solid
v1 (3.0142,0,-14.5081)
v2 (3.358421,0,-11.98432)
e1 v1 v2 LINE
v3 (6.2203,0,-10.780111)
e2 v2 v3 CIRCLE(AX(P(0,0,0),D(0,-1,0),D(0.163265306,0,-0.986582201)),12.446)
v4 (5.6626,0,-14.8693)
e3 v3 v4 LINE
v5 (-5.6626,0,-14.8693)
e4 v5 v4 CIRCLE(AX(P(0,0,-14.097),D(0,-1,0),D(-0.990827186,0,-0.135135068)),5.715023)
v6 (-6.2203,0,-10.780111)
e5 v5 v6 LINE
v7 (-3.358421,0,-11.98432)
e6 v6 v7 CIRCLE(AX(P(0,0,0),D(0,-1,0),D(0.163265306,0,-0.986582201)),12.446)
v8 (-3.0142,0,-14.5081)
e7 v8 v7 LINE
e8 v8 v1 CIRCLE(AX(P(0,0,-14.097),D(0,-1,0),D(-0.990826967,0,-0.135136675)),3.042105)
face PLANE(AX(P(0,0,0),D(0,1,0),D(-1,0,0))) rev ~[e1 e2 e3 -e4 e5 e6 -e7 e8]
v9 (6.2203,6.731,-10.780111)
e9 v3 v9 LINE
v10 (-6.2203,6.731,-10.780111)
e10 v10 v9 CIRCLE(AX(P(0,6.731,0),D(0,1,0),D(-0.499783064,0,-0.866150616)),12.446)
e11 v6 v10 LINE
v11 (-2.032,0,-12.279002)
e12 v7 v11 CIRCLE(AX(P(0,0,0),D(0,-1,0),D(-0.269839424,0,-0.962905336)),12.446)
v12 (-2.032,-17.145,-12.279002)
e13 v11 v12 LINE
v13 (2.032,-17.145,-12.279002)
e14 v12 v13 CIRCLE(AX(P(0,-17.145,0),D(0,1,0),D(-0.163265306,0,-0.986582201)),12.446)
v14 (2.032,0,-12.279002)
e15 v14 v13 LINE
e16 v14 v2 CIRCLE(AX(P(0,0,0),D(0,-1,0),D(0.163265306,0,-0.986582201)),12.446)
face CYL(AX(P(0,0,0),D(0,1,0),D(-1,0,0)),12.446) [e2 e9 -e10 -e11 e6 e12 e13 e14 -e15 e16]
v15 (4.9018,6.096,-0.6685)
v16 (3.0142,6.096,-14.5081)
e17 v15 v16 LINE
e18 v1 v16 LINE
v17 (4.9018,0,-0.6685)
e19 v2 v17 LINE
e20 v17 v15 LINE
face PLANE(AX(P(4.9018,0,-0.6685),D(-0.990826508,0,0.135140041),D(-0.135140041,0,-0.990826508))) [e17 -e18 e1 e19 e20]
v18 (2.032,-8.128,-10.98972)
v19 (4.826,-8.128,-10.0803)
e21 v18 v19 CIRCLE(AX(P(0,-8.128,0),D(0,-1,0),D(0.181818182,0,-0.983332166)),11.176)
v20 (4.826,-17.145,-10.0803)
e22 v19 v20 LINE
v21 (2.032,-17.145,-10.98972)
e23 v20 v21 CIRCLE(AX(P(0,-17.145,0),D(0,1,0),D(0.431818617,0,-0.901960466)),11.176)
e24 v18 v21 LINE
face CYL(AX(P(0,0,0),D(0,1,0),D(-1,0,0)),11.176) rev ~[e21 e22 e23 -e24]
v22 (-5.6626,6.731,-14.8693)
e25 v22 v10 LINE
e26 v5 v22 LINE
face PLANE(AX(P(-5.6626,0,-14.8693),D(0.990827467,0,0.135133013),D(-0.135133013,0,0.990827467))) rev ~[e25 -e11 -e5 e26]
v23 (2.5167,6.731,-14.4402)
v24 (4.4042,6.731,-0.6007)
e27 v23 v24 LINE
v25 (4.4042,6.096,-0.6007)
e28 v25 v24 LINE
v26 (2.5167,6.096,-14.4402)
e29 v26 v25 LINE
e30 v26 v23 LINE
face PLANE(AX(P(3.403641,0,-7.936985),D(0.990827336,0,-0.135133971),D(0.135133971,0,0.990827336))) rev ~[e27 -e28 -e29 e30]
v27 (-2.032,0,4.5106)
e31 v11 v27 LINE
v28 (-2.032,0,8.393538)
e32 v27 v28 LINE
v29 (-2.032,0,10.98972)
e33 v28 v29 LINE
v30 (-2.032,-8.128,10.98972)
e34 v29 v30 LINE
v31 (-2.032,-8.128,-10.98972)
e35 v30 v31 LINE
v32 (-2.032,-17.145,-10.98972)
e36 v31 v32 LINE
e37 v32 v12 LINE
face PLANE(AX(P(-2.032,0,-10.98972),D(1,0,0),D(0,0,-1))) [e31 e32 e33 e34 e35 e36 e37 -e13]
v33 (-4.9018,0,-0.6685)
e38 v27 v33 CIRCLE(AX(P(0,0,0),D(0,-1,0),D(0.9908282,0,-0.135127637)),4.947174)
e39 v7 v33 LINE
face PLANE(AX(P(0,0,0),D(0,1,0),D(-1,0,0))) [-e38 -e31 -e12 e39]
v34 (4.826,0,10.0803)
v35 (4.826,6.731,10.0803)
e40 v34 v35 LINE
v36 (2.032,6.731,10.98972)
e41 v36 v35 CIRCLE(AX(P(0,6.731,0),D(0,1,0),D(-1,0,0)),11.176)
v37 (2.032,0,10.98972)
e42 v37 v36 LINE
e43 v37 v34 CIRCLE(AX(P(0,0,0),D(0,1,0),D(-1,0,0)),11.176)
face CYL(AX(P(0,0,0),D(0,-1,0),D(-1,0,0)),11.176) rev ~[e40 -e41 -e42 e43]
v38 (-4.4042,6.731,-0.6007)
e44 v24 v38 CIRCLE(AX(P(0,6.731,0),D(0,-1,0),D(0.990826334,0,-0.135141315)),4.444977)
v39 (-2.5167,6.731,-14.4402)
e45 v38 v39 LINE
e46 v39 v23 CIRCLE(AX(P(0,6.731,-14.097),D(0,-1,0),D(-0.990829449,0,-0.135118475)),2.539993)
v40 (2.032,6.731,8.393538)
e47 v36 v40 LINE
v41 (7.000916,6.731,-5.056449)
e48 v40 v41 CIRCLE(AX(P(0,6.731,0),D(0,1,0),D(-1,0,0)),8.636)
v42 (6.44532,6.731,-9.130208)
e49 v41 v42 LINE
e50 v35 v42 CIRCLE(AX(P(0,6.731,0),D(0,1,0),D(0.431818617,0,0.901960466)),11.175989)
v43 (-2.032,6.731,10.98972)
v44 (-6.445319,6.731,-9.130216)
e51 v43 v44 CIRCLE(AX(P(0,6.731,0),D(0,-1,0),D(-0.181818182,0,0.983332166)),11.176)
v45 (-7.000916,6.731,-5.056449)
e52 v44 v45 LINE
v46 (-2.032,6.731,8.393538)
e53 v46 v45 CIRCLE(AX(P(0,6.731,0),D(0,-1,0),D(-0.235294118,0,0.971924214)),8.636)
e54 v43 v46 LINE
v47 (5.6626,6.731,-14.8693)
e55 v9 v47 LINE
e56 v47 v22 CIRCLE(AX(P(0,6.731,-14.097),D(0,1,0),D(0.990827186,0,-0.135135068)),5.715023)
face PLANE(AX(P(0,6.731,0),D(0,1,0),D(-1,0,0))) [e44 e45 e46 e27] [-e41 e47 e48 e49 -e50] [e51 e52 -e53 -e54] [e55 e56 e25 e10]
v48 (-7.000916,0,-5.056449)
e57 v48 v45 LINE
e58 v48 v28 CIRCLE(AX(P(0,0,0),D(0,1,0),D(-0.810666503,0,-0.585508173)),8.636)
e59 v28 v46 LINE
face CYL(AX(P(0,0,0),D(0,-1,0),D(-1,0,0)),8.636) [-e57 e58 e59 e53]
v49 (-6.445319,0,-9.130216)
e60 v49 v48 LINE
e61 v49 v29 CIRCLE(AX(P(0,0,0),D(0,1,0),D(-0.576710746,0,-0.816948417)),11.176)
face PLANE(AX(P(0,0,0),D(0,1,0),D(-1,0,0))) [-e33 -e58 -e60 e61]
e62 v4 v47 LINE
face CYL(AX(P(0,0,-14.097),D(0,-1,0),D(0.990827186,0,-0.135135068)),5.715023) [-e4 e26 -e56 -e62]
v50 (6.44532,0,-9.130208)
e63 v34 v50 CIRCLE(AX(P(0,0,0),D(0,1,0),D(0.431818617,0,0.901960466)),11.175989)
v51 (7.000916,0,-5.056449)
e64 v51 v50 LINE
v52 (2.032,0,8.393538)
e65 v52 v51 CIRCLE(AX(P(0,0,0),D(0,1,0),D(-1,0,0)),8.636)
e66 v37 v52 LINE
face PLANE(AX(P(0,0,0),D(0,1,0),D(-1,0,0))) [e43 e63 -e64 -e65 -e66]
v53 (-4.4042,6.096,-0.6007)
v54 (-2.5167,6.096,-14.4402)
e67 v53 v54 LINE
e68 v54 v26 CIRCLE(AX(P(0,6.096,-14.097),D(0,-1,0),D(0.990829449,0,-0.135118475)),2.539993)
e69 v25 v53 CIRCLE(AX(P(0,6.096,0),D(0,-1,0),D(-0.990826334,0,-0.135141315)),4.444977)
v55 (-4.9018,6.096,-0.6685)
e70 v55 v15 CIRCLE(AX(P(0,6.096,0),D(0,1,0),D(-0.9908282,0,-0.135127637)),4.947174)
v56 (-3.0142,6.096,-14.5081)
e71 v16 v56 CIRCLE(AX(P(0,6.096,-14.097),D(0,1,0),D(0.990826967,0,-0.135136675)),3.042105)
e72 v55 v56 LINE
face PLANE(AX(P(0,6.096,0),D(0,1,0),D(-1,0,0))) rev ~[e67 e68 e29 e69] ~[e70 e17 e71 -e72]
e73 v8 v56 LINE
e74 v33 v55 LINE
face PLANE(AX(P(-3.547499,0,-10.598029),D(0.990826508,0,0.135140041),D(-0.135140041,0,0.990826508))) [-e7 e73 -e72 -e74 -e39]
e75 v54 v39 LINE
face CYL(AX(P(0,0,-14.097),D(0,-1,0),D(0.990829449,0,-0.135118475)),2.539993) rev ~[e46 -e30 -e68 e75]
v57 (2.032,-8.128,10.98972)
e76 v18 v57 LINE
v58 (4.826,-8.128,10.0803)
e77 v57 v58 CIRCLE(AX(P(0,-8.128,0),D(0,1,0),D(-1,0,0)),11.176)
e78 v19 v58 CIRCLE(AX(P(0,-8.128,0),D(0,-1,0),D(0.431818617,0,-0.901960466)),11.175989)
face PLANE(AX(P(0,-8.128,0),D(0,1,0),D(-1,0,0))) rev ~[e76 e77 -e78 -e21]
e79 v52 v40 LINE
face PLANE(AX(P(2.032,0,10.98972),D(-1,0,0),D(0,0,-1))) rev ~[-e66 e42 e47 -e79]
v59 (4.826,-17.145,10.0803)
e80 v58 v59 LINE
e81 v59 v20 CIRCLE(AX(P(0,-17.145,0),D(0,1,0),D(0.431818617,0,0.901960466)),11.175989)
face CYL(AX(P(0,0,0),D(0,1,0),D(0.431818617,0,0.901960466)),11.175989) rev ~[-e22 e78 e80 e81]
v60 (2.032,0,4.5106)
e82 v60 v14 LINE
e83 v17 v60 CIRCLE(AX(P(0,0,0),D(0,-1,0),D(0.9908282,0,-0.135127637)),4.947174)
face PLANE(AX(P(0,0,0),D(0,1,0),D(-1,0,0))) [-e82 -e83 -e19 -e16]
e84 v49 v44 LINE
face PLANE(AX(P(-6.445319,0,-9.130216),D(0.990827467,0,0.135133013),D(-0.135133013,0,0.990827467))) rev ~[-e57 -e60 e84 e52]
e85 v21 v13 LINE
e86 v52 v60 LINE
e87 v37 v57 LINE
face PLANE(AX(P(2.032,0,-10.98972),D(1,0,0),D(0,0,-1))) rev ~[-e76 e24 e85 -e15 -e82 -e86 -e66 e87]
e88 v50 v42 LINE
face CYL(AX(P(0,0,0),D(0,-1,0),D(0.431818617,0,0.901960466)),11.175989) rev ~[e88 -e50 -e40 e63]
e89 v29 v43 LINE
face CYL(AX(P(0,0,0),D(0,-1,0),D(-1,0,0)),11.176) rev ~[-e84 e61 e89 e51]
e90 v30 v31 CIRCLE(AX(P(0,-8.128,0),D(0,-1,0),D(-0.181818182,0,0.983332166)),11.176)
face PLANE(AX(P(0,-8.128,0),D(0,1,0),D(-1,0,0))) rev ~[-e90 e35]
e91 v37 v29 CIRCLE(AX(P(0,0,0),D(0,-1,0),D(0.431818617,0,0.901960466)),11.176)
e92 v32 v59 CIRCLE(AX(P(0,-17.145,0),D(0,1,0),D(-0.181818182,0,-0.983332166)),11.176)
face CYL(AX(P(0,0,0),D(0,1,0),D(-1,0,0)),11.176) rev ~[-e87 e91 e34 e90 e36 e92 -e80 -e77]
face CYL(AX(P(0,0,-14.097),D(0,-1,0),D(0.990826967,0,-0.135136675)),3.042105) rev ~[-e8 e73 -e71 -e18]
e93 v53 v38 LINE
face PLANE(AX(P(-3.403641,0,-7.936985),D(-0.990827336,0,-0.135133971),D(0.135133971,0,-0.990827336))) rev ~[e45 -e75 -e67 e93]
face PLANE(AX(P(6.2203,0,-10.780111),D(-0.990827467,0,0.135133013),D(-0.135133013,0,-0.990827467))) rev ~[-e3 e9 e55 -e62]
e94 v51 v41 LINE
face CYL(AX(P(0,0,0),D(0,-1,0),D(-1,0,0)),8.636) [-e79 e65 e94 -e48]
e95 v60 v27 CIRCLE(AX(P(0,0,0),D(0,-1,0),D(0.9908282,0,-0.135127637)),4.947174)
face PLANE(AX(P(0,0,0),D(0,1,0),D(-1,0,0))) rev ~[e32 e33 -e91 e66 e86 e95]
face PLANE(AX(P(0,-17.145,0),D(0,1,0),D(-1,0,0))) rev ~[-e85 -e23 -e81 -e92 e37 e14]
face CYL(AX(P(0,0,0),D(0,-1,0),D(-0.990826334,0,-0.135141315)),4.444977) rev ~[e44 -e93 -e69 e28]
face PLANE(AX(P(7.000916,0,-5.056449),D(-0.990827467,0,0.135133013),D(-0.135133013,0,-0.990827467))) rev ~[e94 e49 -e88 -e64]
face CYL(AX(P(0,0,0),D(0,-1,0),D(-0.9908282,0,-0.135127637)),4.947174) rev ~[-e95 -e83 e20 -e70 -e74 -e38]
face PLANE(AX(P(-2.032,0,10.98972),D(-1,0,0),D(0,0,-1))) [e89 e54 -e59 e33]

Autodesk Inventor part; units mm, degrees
ref_plane "YZ Plane" through (0, 0, 0) normal (1, 0, 0) x (0, 1, 0)
ref_plane "XZ Plane" through (0, 0, 0) normal (0, 1, 0) x (-1, 0, 0)
ref_plane "XY Plane" through (0, 0, 0) normal (0, 0, 1) x (1, 0, 0)
sketch "Block1" plane through (0, 0, 0) normal (0, 0, 1) x (1, 0, 0)
  arc A0 (4.4042, -0.6007) -> (-4.4042, -0.6007) centre (0, 0) ccw
  arc A1 (-2.5167, -14.4402) -> (2.5167, -14.4402) centre (0, -14.097) ccw
  line L0 (-2.5167, -14.4402) -> (-4.4042, -0.6007)
  line L1 (4.4042, -0.6007) -> (2.5167, -14.4402)
  line L2 (-7.5501, -1.0297) -> (-5.6626, -14.8693)
  arc A2 (-5.6626, -14.8693) -> (5.6626, -14.8693) centre (0, -14.097) ccw
  line L3 (5.6626, -14.8693) -> (7.5501, -1.0297)
  arc A3 (7.5501, -1.0297) -> (-7.5501, -1.0297) centre (0, 0) ccw
  line L4 (-4.9018, -0.6685) -> (-3.0142, -14.5081)
  arc A4 (-3.0142, -14.5081) -> (3.0142, -14.5081) centre (0, -14.097) ccw
  line L5 (3.0142, -14.5081) -> (4.9018, -0.6685)
  arc A5 (4.9018, -0.6685) -> (-4.9018, -0.6685) centre (0, 0) ccw
  point P0 (0, -7.4025)
  dimension "d127" = 8.89
  dimension "d131" = 5.08
  dimension "d140" = 3.175
sketch "Sketch10" plane through (0, 0, 0) normal (0, 1, 0) x (-1, 0, 0)
  circle A0 centre (0, 0) radius 8.636
  line L0 (0, -14.097) -> (0, 0)
  arc A1 (-4.826, 10.0803) -> (-4.826, -10.0803) centre (0, 0) ccw
  circle A2 centre (0, 0) radius 11.176
  circle A3 centre (0, 0) radius 12.446
  line L1 (-12.7635, 23.7871) -> (12.7635, 23.7871)
  line L2 (0, 23.7871) -> (0, -23.7871)
  line L3 (-12.7635, -23.7871) -> (12.7635, -23.7871)
  line L4 (-2.032, 23.7871) -> (-2.032, -23.7871)
  line L5 (2.032, 23.7871) -> (2.032, -23.7871)
  line L6 (0, 11.176) -> (0, -22.606)
  line L7 (0, 11.176) -> (0, -22.606)
  arc A4 (4.4042, -0.6007) -> (-4.4042, -0.6007) centre (0, 0) ccw
  arc A5 (-2.5167, -14.4402) -> (2.5167, -14.4402) centre (0, -14.097) ccw
  line L8 (-2.5167, -14.4402) -> (-4.4042, -0.6007)
  line L9 (4.4042, -0.6007) -> (2.5167, -14.4402)
  line L10 (-7.5501, -1.0297) -> (-5.6626, -14.8693)
  arc A6 (-5.6626, -14.8693) -> (5.6626, -14.8693) centre (0, -14.097) ccw
  line L11 (5.6626, -14.8693) -> (7.5501, -1.0297)
  arc A7 (7.5501, -1.0297) -> (-7.5501, -1.0297) centre (0, 0) ccw
  line L12 (-4.9018, -0.6685) -> (-3.0142, -14.5081)
  arc A8 (-3.0142, -14.5081) -> (3.0142, -14.5081) centre (0, -14.097) ccw
  line L13 (3.0142, -14.5081) -> (4.9018, -0.6685)
  arc A9 (4.9018, -0.6685) -> (-4.9018, -0.6685) centre (0, 0) ccw
  point P0 (2.032, -10.9897)
  point P1 (2.032, -12.279)
  point P2 (-2.032, -12.279)
  point P3 (-2.032, -10.9897)
  point P4 (-2.032, 10.9897)
  point P5 (2.032, 10.9897)
  point P6 (-6.1771, -11.0965)
  point P7 (6.1771, -11.0965)
  point P8 (6.4453, -9.1302)
  point P9 (7.0009, -5.0565)
  point P10 (2.032, 8.3935)
  point P11 (-2.032, 8.3935)
  point P12 (-7.0009, -5.0565)
  point P13 (-6.4453, -9.1302)
  point P14 (6.1771, -11.0965)
  point P15 (-6.1771, -11.0965)
  point P16 (2.032, 7.3441)
  point P17 (-7.0009, -5.0565)
  point P18 (7.0009, -5.0565)
  point P19 (6.4453, -9.1302)
  point P20 (2.032, -19.4386)
  point P21 (-6.4453, -9.1302)
  point P22 (2.032, -8.3935)
  point P23 (-2.032, 7.3441)
  point P24 (-2.032, -19.4386)
  point P25 (-2.032, -8.3935)
  point P26 (6.2203, -10.7801)
  point P27 (-6.2203, -10.7801)
  point P28 (2.032, 7.3441)
  point P29 (-7.0009, -5.0565)
  point P30 (7.0009, -5.0565)
  point P31 (6.4453, -9.1302)
  point P32 (2.032, -19.4386)
  point P33 (-6.4453, -9.1302)
  point P34 (-2.032, 7.3441)
  point P35 (-2.032, -19.4386)
  point P36 (-6.4453, -9.1302)
  dimension "d149" = 24.892
  dimension "d148" = 2.032
  dimension "d147" = 2.032
  dimension "d146" = 33.782
  dimension "d159" = 33.782
extrude "Extrusion21" add sketch "Sketch10" against normal blind 17.145 contours L5 A3 L11 A2 | A2 L2 A3 L5 | L11 A3 L13 A2 | A2 L4 A3 L2 | L13 A3 L9 A2 | A2 A1 L10 A3 L4 | L9 A3 L5 A2 | A1 A2 L12 A3 L10 | A2 L8 A3 L12 | A2 L4 A3 L8
extrude "Extrusion22" add sketch "Sketch10" against normal blind 8.128 contours A0 L11 A7 L5 | A0 L5 A2 L11 | L11 A2 L13 A0 | A0 L13 A9 L5 A7 L11 | L13 A2 L9 A0 | A0 L9 A4 L5 A9 L13 | L4 A7 L10 A0 | A0 L10 A1 A2 L4 | L9 A2 L5 A0 | A0 L5 A4 L9 | L10 A7 L4 A9 L12 A0 | A0 L12 A2 A1 L10 | L12 A9 L4 A4 L8 A0 | A0 L8 A2 L12 | L8 A4 L4 A0 | A0 L4 A2 L8
extrude "Extrusion23" add sketch "Sketch10" along normal blind 6.731 contours A0 L11 A7 L5 | L5 A7 L2 A0 | A0 L2 A2 L5 | L11 A2 L13 A0 | A0 L13 A9 L5 A7 L11 | L2 A7 L4 A0 | A0 L4 A2 L2 | L5 A3 L11 A2 | A2 L2 A3 L5 | L5 A9 L2 A7 | L13 A2 L9 A0 | A0 L9 A4 L5 A9 L13 | L11 A3 L13 A2 | L4 A7 L10 A0 | A2 L4 A3 L2 | L2 A9 L4 A7 | L5 A4 L2 A9 | L13 A3 L9 A2 | L11 A6 L5 A8 L13 A3 | L10 A7 L4 A9 L12 A0 | A0 L12 A2 A1 L10 | A2 A1 L10 A3 L4 | L2 A4 L4 A9 | L13 A8 L5 A5 L9 A3 | L12 A9 L4 A4 L8 A0 | A0 L8 A2 L12 | A1 A2 L12 A3 L10 | A6 L2 A8 L5 | A2 L8 A3 L12 | A3 L12 A8 L4 A6 L10 | A8 L2 A5 L5 | A6 L4 A8 L2 | A3 L8 A5 L4 A8 L12 | A8 L4 A5 L2
extrude "Extrusion24" cut sketch "Sketch10" along normal blind 6.096 contours L13 A2 L9 A0 | A0 L9 A4 L5 A9 L13 | L5 A4 L2 A9 | L9 A2 L5 A0 | A0 L5 A4 L9 | L13 A3 L9 A2 | L2 A4 L4 A9 | L5 A0 L0 L2 A4 | L5 A2 L0 A0 | L9 A3 L5 A2 | L13 A8 L5 A5 L9 A3 | L12 A9 L4 A4 L8 A0 | A0 L8 A2 L12 | L2 L0 A0 L4 A4 | L0 A2 L4 A0 | L5 A3 L0 A2 | L9 A5 L5 A3 | L8 A4 L4 A0 | A0 L4 A2 L8 | A2 L8 A3 L12 | L0 A3 L4 A2 | L5 A5 L2 L0 A3 | A8 L2 A5 L5 | A2 L4 A3 L8 | A3 L8 A5 L4 A8 L12 | L0 L2 A5 L4 A3 | A8 L4 A5 L2 | A3 L4 A5 L8
properties part number "Servo Adapter 4"
